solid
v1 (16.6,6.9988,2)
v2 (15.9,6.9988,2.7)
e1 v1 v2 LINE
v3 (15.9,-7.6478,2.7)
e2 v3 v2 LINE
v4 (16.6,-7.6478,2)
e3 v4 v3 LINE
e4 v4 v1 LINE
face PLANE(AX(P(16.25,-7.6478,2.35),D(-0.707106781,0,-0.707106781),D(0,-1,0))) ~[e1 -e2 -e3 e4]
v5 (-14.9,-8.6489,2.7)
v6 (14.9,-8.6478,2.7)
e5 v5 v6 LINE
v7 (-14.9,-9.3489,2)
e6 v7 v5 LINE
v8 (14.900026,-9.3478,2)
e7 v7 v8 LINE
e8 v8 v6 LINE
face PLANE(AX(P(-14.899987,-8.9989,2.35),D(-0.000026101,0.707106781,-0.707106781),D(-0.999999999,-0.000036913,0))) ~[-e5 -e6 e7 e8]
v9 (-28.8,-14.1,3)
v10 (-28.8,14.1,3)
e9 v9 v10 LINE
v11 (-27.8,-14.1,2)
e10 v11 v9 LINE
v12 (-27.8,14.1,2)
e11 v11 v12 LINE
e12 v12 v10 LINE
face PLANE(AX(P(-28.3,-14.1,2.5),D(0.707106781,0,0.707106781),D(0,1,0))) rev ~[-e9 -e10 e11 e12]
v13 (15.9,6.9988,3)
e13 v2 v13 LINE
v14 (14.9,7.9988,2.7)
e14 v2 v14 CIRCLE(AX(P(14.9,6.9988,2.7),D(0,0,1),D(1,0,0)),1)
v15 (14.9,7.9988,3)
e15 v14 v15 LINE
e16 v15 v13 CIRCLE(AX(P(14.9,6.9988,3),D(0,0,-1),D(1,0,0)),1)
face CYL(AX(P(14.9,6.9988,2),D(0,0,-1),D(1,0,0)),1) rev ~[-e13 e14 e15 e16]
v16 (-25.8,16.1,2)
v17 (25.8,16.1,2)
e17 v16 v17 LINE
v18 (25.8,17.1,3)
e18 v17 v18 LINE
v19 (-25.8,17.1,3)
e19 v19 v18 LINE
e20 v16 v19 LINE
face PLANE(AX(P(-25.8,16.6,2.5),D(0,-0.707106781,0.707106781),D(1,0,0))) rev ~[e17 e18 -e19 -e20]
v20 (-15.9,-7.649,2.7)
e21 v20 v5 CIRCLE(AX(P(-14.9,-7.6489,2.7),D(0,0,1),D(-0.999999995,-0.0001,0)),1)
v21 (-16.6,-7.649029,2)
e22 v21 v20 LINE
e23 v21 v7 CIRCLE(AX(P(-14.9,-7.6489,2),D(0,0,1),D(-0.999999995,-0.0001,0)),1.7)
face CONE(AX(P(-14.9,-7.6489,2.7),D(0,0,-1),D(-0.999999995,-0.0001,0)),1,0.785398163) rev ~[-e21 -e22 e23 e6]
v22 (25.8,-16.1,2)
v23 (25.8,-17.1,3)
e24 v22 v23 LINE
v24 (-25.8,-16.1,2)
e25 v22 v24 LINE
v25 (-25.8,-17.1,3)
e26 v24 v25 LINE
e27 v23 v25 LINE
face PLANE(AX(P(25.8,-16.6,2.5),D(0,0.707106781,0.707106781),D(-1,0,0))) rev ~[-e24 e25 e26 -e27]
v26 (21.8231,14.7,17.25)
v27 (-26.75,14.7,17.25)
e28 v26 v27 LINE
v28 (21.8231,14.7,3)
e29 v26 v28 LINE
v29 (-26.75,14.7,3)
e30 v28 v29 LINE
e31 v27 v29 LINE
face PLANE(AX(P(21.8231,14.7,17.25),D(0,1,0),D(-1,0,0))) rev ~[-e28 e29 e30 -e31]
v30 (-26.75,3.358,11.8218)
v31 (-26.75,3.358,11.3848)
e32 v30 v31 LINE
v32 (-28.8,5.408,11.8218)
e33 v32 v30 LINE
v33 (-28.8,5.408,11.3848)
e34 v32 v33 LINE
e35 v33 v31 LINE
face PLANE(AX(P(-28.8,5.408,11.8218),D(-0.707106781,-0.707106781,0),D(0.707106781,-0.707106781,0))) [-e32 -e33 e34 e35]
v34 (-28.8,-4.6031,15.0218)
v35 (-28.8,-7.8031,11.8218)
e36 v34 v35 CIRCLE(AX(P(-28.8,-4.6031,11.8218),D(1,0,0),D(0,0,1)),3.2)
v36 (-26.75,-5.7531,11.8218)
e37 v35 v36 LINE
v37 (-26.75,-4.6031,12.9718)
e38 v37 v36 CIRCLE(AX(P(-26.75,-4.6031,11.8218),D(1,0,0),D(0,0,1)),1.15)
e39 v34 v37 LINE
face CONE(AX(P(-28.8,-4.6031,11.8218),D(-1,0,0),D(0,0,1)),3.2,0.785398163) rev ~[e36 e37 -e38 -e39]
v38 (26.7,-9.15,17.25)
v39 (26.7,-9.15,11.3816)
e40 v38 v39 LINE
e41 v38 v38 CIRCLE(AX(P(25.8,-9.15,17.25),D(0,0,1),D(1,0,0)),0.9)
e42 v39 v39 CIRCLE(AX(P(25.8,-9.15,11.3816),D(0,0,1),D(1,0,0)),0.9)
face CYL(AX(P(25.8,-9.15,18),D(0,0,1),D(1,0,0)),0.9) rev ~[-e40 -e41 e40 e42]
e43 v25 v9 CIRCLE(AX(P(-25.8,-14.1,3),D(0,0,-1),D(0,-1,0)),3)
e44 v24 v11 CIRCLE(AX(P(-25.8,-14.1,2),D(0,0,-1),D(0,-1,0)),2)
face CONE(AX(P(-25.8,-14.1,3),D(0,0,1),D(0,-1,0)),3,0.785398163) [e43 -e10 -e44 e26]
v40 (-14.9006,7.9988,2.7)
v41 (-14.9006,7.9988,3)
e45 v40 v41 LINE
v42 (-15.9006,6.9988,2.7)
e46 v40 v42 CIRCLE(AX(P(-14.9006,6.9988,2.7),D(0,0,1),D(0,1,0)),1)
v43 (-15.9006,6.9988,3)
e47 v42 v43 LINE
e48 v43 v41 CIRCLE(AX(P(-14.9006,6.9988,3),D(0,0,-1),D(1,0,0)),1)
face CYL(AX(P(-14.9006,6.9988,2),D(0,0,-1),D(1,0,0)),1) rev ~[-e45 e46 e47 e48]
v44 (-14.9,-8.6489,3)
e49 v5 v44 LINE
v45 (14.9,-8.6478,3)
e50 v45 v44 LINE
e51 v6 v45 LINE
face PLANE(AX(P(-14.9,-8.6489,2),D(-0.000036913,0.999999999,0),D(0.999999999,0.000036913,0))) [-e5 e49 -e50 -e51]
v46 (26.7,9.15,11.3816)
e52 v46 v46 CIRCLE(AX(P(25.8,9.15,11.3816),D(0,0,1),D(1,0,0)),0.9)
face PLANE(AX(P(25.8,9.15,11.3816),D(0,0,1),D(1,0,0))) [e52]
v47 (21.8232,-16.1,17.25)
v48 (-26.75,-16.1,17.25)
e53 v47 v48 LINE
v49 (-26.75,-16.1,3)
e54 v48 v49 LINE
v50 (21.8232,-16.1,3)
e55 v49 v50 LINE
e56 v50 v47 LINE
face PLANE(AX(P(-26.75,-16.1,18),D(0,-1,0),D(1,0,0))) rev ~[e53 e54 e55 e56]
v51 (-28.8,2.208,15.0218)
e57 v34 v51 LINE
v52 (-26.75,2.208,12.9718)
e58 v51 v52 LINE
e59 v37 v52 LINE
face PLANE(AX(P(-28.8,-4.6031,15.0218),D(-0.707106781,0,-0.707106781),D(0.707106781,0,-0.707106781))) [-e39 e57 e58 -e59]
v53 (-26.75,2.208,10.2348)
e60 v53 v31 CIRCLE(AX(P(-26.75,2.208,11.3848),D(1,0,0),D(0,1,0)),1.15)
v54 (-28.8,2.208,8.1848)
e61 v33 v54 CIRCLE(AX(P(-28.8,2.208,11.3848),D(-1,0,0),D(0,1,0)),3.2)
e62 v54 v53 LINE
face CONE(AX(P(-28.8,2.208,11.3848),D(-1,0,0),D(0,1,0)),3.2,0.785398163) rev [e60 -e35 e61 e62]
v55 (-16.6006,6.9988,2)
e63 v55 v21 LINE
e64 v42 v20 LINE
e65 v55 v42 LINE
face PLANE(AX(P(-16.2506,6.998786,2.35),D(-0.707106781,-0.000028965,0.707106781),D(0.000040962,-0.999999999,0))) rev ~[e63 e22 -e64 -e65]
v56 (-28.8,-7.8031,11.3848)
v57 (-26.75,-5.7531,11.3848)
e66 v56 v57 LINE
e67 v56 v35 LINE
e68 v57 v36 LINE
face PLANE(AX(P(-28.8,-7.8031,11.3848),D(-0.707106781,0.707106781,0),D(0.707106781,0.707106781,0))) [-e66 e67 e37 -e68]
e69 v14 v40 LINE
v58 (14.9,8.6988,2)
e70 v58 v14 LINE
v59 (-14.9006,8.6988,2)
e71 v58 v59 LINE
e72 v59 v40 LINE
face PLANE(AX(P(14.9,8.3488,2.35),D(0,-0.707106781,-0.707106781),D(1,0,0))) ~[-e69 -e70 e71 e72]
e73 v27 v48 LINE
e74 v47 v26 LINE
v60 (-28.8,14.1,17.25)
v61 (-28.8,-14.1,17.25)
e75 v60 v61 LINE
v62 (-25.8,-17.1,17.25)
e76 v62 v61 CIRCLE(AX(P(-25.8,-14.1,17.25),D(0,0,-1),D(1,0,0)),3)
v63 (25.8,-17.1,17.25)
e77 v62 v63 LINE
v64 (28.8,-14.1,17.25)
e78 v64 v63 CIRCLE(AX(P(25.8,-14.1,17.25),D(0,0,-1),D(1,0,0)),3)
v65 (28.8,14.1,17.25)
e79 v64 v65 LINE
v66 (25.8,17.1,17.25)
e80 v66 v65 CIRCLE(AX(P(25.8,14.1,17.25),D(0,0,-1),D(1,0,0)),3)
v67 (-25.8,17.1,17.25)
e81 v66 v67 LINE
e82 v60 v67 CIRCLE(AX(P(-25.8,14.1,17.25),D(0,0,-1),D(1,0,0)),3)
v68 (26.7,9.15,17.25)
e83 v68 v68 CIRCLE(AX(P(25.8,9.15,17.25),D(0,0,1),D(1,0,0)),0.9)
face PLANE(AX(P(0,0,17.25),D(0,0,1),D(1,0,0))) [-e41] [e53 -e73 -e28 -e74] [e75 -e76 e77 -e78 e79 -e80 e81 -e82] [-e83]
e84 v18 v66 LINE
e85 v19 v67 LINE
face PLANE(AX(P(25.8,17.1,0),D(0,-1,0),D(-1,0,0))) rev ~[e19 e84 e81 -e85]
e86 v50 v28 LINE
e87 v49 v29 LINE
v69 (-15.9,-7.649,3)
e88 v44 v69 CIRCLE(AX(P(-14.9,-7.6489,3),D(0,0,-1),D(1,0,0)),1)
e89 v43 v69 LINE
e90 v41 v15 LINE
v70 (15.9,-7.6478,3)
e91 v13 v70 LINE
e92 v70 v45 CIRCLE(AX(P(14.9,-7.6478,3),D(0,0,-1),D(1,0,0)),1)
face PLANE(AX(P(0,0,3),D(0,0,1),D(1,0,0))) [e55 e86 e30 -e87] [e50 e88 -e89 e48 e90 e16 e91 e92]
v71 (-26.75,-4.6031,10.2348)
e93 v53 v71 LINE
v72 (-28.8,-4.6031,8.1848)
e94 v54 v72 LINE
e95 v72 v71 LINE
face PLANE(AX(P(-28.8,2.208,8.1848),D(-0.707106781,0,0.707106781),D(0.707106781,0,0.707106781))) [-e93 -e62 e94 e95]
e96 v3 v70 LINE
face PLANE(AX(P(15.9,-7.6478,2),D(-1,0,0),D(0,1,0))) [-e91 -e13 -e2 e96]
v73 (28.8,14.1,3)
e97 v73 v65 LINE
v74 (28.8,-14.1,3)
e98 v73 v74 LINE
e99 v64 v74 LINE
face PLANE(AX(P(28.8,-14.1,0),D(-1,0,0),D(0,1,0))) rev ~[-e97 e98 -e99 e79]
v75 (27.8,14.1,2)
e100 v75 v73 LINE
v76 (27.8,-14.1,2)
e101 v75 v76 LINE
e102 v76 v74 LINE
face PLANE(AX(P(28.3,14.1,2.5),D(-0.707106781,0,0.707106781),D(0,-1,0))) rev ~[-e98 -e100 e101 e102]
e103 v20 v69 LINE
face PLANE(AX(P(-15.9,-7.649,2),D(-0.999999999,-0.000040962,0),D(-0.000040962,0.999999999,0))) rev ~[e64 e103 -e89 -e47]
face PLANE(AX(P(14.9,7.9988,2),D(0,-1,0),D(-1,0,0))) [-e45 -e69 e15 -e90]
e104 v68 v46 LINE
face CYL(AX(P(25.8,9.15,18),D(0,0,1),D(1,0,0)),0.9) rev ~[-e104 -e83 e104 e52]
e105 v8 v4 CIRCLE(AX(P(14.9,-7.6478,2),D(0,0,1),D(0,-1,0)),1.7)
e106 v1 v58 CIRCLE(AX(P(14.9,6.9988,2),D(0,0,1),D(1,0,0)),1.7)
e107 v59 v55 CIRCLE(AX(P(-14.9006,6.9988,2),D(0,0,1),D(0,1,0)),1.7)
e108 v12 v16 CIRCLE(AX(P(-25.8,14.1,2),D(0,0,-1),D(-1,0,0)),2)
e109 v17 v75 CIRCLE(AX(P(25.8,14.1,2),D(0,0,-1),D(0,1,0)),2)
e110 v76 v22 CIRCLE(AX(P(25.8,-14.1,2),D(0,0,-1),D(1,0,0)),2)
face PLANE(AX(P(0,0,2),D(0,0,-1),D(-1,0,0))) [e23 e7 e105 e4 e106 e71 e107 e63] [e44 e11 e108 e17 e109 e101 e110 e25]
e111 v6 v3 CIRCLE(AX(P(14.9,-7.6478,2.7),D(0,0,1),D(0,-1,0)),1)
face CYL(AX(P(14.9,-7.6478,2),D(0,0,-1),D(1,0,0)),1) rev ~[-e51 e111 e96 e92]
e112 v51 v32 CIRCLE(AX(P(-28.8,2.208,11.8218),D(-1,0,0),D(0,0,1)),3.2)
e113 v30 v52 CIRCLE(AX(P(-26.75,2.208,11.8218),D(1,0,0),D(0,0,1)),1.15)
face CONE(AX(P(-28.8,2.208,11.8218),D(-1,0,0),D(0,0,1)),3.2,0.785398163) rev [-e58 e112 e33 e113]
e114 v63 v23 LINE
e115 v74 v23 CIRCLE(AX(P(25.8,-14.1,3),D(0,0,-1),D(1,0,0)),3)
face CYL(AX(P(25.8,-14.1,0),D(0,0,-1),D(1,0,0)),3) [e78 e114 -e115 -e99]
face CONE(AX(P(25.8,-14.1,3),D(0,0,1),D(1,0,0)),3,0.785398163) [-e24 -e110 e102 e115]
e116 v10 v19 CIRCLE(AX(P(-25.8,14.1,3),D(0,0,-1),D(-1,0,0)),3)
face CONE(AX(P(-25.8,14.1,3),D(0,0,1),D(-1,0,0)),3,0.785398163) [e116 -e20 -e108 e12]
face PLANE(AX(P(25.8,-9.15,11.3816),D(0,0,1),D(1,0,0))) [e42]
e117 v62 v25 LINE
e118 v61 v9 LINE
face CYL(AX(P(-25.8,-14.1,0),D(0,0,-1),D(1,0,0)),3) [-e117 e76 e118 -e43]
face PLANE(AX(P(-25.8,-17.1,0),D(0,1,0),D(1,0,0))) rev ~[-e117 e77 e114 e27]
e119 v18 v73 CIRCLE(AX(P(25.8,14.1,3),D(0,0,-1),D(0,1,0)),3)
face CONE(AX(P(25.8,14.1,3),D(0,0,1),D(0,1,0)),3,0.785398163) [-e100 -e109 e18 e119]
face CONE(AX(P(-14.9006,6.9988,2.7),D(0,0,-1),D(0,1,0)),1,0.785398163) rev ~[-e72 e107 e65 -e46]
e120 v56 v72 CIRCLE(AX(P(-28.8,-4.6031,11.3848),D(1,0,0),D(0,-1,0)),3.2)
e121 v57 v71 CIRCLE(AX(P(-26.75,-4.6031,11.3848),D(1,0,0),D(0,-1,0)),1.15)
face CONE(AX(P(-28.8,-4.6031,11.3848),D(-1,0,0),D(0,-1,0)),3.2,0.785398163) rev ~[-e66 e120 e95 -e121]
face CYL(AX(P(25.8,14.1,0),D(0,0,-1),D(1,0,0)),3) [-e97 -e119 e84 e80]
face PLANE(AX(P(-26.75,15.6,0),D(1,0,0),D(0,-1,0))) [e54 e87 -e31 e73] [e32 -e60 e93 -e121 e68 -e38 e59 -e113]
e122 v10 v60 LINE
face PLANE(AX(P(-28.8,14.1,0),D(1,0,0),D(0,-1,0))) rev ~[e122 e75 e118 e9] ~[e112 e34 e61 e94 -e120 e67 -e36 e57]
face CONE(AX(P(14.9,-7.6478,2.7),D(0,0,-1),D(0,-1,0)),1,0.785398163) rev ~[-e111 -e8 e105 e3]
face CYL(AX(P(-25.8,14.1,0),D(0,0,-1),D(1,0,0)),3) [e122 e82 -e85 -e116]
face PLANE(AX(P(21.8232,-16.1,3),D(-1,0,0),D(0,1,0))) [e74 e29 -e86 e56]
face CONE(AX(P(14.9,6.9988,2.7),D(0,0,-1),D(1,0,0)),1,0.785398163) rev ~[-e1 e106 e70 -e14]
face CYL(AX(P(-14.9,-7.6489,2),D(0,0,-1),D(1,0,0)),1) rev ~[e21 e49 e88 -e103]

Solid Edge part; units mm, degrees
sketch "Sketch1" plane through (0, 0, 0) normal (0, 0, 1) x (1, 0, 0)
  line L0 (-26.75, -15.6) -> (26.75, -15.6)
  line L1 (26.75, -15.6) -> (26.75, 15.6)
  line L2 (26.75, 15.6) -> (-26.75, 15.6)
  line L3 (-26.75, 15.6) -> (-26.75, -15.6)
extrude "Protrusion1" add sketch "Sketch1" along normal blind 3
sketch "Sketch2" plane through (0, 0, 0) normal (0, 0, 1) x (1, 0, 0)
  line L0 (-26.75, -15.6) -> (26.75, -15.6)
  line L1 (26.75, -15.6) -> (26.75, 15.6)
  line L2 (26.75, 15.6) -> (-26.75, 15.6)
  line L3 (-26.75, 15.6) -> (-26.75, -15.6)
  line L4 (-25.8, -17.1) -> (25.8, -17.1)
  arc A0 (28.8, -14.1) -> (25.8, -17.1) centre (25.8, -14.1) cw
  line L5 (28.8, -14.1) -> (28.8, 14.1)
  arc A1 (25.8, 17.1) -> (28.8, 14.1) centre (25.8, 14.1) cw
  line L6 (25.8, 17.1) -> (-25.8, 17.1)
  arc A2 (-28.8, 14.1) -> (-25.8, 17.1) centre (-25.8, 14.1) cw
  line L7 (-28.8, 14.1) -> (-28.8, -14.1)
  arc A3 (-28.8, -14.1) -> (-25.8, -17.1) centre (-25.8, -14.1) ccw
extrude "Wyciągnięcie_2" add sketch "Sketch2" along normal blind 15
chamfer "Faza_4" distance 1 angle 45 8 edges at (28.8, 0, 0) (27.9213, 16.2213, 0) (0, 17.1, 0) (-27.9213, 16.2213, 0) (-28.8, 0, 0) (-27.9213, -16.2213, 0) (0, -17.1, 0) (27.9213, -16.2213, 0)
sketch "Sketch3" plane through (0, 0, 3) normal (0, 0, 1) x (1, 0, 0)
  line L0 (26.75, 15.6) -> (22.07, 15.6)
  line L1 (22.07, 15.6) -> (22.07, -15.6)
  line L2 (22.07, -15.6) -> (26.75, -15.6)
  line L3 (26.75, -15.6) -> (26.75, 15.6)
extrude "Wycięcie_2" add sketch "Sketch3" along normal blind 12
sketch "Sketch4" plane through (-28.8, 0, 8) normal (-1, 0, 0) x (0, -1, 0)
  line L0 (-2.208, 2.2848) -> (4.6031, 2.2848)
  arc A0 (5.7031, 3.3848) -> (4.6031, 2.2848) centre (4.6031, 3.3848) cw
  line L1 (5.7031, 3.3848) -> (5.7031, 3.8218)
  arc A1 (4.6031, 4.9218) -> (5.7031, 3.8218) centre (4.6031, 3.8218) cw
  line L2 (4.6031, 4.9218) -> (-2.208, 4.9218)
  arc A2 (-2.208, 4.9218) -> (-3.308, 3.8218) centre (-2.208, 3.8218) ccw
  line L3 (-3.308, 3.8218) -> (-3.308, 3.3848)
  arc A3 (-3.308, 3.3848) -> (-2.208, 2.2848) centre (-2.208, 3.3848) ccw
  dimension "D1" = 1.1
  dimension "D2" = 1.1
  dimension "D3" = 1.1
  dimension "D4" = 1.1
  dimension "D5" = 0.4371
extrude "Wycięcie_3" cut sketch "Sketch4" against normal blind 11.9554
sketch "Sketch5" plane through (-2.34, 0, 3) normal (0, 0, 1) x (1, 0, 0)
  line L0 (-24.41, 15.6) -> (-24.41, 15.2)
  line L1 (-24.41, 15.2) -> (24.41, 15.2)
  line L2 (24.41, 15.2) -> (24.41, 15.6)
  line L3 (24.41, 15.6) -> (-24.41, 15.6)
extrude "Wyciągnięcie_4" add sketch "Sketch5" along normal blind 12
sketch "Sketch6" plane through (-0.1019, 0, 15) normal (0, 0, 1) x (1, 0, 0)
  line L0 (-25.6981, -17.1) -> (25.9019, -17.1)
  arc A0 (25.9019, -17.1) -> (28.9019, -14.1) centre (25.9019, -14.1) ccw
  line L1 (28.9019, -14.1) -> (28.9019, 14.1)
  arc A1 (25.9019, 17.1) -> (28.9019, 14.1) centre (25.9019, 14.1) cw
  line L2 (25.9019, 17.1) -> (-25.6981, 17.1)
  arc A2 (-28.6981, 14.1) -> (-25.6981, 17.1) centre (-25.6981, 14.1) cw
  line L3 (-28.6981, 14.1) -> (-28.6981, -14.1)
  arc A3 (-28.6981, -14.1) -> (-25.6981, -17.1) centre (-25.6981, -14.1) ccw
  line L4 (-26.6481, 15.2) -> (22.1719, 15.2)
  line L5 (22.1719, 15.2) -> (22.1719, -15.6)
  line L6 (22.1719, -15.6) -> (-26.6481, -15.6)
  line L7 (-26.6481, -15.6) -> (-26.6481, 15.2)
extrude "Wyciągnięcie_5" add sketch "Sketch6" along normal blind 3
sketch "Sketch7" plane through (0, 0, 18) normal (0, 0, 1) x (1, 0, 0)
  line L0 (-26.75, -15.6) -> (-26.75, -16.1)
  line L1 (-26.75, -16.1) -> (22.0731, -16.1)
  line L2 (22.0731, -16.1) -> (22.07, -15.6)
  line L3 (22.07, -15.6) -> (-26.75, -15.6)
extrude "Wycięcie_6" cut sketch "Sketch7" against normal blind 15
sketch "Sketch8" plane through (0, 0, 18) normal (0, 0, 1) x (1, 0, 0)
  circle A0 centre (25.8, 9.15) radius 0.9
  circle A1 centre (25.8, -9.15) radius 0.9
extrude "Wycięcie_7" cut sketch "Sketch8" against normal blind 6.6184
sketch "Sketch9" plane through (-2.3384, -0.45, 3) normal (0, 0, 1) x (-1, 0, 0)
  line L0 (-24.4116, 15.65) -> (-24.1616, 15.65)
  line L1 (-24.1616, 15.65) -> (-24.1616, -15.65)
  line L2 (-24.1616, -15.65) -> (-24.4084, -15.65)
  line L3 (-24.4084, -15.65) -> (-24.4116, 15.65)
  dimension "D1" = 0.25
extrude "Wyciągnięcie_6" add sketch "Sketch9" along normal blind 15
sketch "Sketch10" plane through (0, 0, 18) normal (0, 0, 1) x (-1, 0, 0)
  line L0 (-38.4633, -19.2005) -> (38.4633, -19.2005)
  line L1 (38.4633, -19.2005) -> (38.4633, 19.2005)
  line L2 (38.4633, 19.2005) -> (-38.4633, 19.2005)
  line L3 (-38.4633, 19.2005) -> (-38.4633, -19.2005)
extrude "Wycięcie_9" cut sketch "Sketch10" against normal blind 0.75
sketch "Sketch11" plane through (0, 0, 0) normal (0, 0, -1) x (1, 0, 0)
  line L0 (-34.3065, -19.3102) -> (34.3065, -19.3102)
  line L1 (34.3065, -19.3102) -> (34.3065, 19.3102)
  line L2 (34.3065, 19.3102) -> (-34.3065, 19.3102)
  line L3 (-34.3065, 19.3102) -> (-34.3065, -19.3102)
  dimension "D1" = 68.6129
  dimension "D2" = 38.6204
extrude "Wycięcie_10" cut sketch "Sketch11" against normal blind 2
chamfer "Faza_13" distance 1 angle 45 8 edges at (-28.8, 0, 2) (-27.9213, 16.2213, 2) (0, 17.1, 2) (27.9213, 16.2213, 2) (28.8, 0, 2) (27.9213, -16.2213, 2) (0, -17.1, 2) (-27.9213, -16.2213, 2)
sketch "Sketch12" plane through (0, 0, 17.25) normal (0, 0, 1) x (-1, 0, 0)
  line L0 (-21.8231, -15.2) -> (-21.8231, -14.7)
  line L1 (-21.8231, -14.7) -> (26.75, -14.7)
  line L2 (26.75, -14.7) -> (26.75, -15.2)
  line L3 (26.75, -15.2) -> (-21.8231, -15.2)
  dimension "D1" = 0.5
extrude "Protrusion2" add sketch "Sketch12" against normal up to vertex (14.25 mm away)
sketch "Sketch13" plane through (0, 0, 2) normal (0, 0, -1) x (1, 0, 0)
  line L0 (-14.9, 8.6489) -> (14.9, 8.6478)
  arc A0 (14.9, 8.6478) -> (15.9, 7.6478) centre (14.9, 7.6478) cw
  line L1 (15.9, 7.6478) -> (15.9, -6.9988)
  arc A1 (14.9, -7.9988) -> (15.9, -6.9988) centre (14.9, -6.9988) ccw
  line L2 (14.9, -7.9988) -> (-14.9006, -7.9988)
  arc A2 (-15.9006, -6.9988) -> (-14.9006, -7.9988) centre (-14.9006, -6.9988) ccw
  line L3 (-15.9, 7.649) -> (-15.9006, -6.9988)
  arc A3 (-15.9, 7.649) -> (-14.9, 8.6489) centre (-14.9, 7.6489) cw
  dimension "D1" = 14.6477
  dimension "D2" = 14.6466
  dimension "D3" = 29.8006
  dimension "D4" = 1
  dimension "D5" = 1
  dimension "D6" = 1
  dimension "D7" = 1
extrude "Wyciągnięcie_8" cut sketch "Sketch13" against normal blind 166.3187
chamfer "Faza_16" distance 2.1 angle 45 8 edges at (-28.8, -1.1976, 10.2848) (-28.8, -5.381, 10.6069) (-28.8, -5.7031, 11.6033) (-28.8, -5.381, 12.5996) (-28.8, -1.1976, 12.9218) (-28.8, 2.9858, 12.5996) (-28.8, 3.308, 11.6033) (-28.8, 2.9858, 10.6069)
chamfer "Faza_17" distance 0.7 angle 45 8 edges at (-0.0003, 7.9988, 2) (-15.6077, 7.7059, 2) (-15.9003, -0.3251, 2) (-15.6071, -8.3561, 2) (0, -8.6484, 2) (15.6071, -8.3549, 2) (15.9, -0.3245, 2) (15.6071, 7.7059, 2)
